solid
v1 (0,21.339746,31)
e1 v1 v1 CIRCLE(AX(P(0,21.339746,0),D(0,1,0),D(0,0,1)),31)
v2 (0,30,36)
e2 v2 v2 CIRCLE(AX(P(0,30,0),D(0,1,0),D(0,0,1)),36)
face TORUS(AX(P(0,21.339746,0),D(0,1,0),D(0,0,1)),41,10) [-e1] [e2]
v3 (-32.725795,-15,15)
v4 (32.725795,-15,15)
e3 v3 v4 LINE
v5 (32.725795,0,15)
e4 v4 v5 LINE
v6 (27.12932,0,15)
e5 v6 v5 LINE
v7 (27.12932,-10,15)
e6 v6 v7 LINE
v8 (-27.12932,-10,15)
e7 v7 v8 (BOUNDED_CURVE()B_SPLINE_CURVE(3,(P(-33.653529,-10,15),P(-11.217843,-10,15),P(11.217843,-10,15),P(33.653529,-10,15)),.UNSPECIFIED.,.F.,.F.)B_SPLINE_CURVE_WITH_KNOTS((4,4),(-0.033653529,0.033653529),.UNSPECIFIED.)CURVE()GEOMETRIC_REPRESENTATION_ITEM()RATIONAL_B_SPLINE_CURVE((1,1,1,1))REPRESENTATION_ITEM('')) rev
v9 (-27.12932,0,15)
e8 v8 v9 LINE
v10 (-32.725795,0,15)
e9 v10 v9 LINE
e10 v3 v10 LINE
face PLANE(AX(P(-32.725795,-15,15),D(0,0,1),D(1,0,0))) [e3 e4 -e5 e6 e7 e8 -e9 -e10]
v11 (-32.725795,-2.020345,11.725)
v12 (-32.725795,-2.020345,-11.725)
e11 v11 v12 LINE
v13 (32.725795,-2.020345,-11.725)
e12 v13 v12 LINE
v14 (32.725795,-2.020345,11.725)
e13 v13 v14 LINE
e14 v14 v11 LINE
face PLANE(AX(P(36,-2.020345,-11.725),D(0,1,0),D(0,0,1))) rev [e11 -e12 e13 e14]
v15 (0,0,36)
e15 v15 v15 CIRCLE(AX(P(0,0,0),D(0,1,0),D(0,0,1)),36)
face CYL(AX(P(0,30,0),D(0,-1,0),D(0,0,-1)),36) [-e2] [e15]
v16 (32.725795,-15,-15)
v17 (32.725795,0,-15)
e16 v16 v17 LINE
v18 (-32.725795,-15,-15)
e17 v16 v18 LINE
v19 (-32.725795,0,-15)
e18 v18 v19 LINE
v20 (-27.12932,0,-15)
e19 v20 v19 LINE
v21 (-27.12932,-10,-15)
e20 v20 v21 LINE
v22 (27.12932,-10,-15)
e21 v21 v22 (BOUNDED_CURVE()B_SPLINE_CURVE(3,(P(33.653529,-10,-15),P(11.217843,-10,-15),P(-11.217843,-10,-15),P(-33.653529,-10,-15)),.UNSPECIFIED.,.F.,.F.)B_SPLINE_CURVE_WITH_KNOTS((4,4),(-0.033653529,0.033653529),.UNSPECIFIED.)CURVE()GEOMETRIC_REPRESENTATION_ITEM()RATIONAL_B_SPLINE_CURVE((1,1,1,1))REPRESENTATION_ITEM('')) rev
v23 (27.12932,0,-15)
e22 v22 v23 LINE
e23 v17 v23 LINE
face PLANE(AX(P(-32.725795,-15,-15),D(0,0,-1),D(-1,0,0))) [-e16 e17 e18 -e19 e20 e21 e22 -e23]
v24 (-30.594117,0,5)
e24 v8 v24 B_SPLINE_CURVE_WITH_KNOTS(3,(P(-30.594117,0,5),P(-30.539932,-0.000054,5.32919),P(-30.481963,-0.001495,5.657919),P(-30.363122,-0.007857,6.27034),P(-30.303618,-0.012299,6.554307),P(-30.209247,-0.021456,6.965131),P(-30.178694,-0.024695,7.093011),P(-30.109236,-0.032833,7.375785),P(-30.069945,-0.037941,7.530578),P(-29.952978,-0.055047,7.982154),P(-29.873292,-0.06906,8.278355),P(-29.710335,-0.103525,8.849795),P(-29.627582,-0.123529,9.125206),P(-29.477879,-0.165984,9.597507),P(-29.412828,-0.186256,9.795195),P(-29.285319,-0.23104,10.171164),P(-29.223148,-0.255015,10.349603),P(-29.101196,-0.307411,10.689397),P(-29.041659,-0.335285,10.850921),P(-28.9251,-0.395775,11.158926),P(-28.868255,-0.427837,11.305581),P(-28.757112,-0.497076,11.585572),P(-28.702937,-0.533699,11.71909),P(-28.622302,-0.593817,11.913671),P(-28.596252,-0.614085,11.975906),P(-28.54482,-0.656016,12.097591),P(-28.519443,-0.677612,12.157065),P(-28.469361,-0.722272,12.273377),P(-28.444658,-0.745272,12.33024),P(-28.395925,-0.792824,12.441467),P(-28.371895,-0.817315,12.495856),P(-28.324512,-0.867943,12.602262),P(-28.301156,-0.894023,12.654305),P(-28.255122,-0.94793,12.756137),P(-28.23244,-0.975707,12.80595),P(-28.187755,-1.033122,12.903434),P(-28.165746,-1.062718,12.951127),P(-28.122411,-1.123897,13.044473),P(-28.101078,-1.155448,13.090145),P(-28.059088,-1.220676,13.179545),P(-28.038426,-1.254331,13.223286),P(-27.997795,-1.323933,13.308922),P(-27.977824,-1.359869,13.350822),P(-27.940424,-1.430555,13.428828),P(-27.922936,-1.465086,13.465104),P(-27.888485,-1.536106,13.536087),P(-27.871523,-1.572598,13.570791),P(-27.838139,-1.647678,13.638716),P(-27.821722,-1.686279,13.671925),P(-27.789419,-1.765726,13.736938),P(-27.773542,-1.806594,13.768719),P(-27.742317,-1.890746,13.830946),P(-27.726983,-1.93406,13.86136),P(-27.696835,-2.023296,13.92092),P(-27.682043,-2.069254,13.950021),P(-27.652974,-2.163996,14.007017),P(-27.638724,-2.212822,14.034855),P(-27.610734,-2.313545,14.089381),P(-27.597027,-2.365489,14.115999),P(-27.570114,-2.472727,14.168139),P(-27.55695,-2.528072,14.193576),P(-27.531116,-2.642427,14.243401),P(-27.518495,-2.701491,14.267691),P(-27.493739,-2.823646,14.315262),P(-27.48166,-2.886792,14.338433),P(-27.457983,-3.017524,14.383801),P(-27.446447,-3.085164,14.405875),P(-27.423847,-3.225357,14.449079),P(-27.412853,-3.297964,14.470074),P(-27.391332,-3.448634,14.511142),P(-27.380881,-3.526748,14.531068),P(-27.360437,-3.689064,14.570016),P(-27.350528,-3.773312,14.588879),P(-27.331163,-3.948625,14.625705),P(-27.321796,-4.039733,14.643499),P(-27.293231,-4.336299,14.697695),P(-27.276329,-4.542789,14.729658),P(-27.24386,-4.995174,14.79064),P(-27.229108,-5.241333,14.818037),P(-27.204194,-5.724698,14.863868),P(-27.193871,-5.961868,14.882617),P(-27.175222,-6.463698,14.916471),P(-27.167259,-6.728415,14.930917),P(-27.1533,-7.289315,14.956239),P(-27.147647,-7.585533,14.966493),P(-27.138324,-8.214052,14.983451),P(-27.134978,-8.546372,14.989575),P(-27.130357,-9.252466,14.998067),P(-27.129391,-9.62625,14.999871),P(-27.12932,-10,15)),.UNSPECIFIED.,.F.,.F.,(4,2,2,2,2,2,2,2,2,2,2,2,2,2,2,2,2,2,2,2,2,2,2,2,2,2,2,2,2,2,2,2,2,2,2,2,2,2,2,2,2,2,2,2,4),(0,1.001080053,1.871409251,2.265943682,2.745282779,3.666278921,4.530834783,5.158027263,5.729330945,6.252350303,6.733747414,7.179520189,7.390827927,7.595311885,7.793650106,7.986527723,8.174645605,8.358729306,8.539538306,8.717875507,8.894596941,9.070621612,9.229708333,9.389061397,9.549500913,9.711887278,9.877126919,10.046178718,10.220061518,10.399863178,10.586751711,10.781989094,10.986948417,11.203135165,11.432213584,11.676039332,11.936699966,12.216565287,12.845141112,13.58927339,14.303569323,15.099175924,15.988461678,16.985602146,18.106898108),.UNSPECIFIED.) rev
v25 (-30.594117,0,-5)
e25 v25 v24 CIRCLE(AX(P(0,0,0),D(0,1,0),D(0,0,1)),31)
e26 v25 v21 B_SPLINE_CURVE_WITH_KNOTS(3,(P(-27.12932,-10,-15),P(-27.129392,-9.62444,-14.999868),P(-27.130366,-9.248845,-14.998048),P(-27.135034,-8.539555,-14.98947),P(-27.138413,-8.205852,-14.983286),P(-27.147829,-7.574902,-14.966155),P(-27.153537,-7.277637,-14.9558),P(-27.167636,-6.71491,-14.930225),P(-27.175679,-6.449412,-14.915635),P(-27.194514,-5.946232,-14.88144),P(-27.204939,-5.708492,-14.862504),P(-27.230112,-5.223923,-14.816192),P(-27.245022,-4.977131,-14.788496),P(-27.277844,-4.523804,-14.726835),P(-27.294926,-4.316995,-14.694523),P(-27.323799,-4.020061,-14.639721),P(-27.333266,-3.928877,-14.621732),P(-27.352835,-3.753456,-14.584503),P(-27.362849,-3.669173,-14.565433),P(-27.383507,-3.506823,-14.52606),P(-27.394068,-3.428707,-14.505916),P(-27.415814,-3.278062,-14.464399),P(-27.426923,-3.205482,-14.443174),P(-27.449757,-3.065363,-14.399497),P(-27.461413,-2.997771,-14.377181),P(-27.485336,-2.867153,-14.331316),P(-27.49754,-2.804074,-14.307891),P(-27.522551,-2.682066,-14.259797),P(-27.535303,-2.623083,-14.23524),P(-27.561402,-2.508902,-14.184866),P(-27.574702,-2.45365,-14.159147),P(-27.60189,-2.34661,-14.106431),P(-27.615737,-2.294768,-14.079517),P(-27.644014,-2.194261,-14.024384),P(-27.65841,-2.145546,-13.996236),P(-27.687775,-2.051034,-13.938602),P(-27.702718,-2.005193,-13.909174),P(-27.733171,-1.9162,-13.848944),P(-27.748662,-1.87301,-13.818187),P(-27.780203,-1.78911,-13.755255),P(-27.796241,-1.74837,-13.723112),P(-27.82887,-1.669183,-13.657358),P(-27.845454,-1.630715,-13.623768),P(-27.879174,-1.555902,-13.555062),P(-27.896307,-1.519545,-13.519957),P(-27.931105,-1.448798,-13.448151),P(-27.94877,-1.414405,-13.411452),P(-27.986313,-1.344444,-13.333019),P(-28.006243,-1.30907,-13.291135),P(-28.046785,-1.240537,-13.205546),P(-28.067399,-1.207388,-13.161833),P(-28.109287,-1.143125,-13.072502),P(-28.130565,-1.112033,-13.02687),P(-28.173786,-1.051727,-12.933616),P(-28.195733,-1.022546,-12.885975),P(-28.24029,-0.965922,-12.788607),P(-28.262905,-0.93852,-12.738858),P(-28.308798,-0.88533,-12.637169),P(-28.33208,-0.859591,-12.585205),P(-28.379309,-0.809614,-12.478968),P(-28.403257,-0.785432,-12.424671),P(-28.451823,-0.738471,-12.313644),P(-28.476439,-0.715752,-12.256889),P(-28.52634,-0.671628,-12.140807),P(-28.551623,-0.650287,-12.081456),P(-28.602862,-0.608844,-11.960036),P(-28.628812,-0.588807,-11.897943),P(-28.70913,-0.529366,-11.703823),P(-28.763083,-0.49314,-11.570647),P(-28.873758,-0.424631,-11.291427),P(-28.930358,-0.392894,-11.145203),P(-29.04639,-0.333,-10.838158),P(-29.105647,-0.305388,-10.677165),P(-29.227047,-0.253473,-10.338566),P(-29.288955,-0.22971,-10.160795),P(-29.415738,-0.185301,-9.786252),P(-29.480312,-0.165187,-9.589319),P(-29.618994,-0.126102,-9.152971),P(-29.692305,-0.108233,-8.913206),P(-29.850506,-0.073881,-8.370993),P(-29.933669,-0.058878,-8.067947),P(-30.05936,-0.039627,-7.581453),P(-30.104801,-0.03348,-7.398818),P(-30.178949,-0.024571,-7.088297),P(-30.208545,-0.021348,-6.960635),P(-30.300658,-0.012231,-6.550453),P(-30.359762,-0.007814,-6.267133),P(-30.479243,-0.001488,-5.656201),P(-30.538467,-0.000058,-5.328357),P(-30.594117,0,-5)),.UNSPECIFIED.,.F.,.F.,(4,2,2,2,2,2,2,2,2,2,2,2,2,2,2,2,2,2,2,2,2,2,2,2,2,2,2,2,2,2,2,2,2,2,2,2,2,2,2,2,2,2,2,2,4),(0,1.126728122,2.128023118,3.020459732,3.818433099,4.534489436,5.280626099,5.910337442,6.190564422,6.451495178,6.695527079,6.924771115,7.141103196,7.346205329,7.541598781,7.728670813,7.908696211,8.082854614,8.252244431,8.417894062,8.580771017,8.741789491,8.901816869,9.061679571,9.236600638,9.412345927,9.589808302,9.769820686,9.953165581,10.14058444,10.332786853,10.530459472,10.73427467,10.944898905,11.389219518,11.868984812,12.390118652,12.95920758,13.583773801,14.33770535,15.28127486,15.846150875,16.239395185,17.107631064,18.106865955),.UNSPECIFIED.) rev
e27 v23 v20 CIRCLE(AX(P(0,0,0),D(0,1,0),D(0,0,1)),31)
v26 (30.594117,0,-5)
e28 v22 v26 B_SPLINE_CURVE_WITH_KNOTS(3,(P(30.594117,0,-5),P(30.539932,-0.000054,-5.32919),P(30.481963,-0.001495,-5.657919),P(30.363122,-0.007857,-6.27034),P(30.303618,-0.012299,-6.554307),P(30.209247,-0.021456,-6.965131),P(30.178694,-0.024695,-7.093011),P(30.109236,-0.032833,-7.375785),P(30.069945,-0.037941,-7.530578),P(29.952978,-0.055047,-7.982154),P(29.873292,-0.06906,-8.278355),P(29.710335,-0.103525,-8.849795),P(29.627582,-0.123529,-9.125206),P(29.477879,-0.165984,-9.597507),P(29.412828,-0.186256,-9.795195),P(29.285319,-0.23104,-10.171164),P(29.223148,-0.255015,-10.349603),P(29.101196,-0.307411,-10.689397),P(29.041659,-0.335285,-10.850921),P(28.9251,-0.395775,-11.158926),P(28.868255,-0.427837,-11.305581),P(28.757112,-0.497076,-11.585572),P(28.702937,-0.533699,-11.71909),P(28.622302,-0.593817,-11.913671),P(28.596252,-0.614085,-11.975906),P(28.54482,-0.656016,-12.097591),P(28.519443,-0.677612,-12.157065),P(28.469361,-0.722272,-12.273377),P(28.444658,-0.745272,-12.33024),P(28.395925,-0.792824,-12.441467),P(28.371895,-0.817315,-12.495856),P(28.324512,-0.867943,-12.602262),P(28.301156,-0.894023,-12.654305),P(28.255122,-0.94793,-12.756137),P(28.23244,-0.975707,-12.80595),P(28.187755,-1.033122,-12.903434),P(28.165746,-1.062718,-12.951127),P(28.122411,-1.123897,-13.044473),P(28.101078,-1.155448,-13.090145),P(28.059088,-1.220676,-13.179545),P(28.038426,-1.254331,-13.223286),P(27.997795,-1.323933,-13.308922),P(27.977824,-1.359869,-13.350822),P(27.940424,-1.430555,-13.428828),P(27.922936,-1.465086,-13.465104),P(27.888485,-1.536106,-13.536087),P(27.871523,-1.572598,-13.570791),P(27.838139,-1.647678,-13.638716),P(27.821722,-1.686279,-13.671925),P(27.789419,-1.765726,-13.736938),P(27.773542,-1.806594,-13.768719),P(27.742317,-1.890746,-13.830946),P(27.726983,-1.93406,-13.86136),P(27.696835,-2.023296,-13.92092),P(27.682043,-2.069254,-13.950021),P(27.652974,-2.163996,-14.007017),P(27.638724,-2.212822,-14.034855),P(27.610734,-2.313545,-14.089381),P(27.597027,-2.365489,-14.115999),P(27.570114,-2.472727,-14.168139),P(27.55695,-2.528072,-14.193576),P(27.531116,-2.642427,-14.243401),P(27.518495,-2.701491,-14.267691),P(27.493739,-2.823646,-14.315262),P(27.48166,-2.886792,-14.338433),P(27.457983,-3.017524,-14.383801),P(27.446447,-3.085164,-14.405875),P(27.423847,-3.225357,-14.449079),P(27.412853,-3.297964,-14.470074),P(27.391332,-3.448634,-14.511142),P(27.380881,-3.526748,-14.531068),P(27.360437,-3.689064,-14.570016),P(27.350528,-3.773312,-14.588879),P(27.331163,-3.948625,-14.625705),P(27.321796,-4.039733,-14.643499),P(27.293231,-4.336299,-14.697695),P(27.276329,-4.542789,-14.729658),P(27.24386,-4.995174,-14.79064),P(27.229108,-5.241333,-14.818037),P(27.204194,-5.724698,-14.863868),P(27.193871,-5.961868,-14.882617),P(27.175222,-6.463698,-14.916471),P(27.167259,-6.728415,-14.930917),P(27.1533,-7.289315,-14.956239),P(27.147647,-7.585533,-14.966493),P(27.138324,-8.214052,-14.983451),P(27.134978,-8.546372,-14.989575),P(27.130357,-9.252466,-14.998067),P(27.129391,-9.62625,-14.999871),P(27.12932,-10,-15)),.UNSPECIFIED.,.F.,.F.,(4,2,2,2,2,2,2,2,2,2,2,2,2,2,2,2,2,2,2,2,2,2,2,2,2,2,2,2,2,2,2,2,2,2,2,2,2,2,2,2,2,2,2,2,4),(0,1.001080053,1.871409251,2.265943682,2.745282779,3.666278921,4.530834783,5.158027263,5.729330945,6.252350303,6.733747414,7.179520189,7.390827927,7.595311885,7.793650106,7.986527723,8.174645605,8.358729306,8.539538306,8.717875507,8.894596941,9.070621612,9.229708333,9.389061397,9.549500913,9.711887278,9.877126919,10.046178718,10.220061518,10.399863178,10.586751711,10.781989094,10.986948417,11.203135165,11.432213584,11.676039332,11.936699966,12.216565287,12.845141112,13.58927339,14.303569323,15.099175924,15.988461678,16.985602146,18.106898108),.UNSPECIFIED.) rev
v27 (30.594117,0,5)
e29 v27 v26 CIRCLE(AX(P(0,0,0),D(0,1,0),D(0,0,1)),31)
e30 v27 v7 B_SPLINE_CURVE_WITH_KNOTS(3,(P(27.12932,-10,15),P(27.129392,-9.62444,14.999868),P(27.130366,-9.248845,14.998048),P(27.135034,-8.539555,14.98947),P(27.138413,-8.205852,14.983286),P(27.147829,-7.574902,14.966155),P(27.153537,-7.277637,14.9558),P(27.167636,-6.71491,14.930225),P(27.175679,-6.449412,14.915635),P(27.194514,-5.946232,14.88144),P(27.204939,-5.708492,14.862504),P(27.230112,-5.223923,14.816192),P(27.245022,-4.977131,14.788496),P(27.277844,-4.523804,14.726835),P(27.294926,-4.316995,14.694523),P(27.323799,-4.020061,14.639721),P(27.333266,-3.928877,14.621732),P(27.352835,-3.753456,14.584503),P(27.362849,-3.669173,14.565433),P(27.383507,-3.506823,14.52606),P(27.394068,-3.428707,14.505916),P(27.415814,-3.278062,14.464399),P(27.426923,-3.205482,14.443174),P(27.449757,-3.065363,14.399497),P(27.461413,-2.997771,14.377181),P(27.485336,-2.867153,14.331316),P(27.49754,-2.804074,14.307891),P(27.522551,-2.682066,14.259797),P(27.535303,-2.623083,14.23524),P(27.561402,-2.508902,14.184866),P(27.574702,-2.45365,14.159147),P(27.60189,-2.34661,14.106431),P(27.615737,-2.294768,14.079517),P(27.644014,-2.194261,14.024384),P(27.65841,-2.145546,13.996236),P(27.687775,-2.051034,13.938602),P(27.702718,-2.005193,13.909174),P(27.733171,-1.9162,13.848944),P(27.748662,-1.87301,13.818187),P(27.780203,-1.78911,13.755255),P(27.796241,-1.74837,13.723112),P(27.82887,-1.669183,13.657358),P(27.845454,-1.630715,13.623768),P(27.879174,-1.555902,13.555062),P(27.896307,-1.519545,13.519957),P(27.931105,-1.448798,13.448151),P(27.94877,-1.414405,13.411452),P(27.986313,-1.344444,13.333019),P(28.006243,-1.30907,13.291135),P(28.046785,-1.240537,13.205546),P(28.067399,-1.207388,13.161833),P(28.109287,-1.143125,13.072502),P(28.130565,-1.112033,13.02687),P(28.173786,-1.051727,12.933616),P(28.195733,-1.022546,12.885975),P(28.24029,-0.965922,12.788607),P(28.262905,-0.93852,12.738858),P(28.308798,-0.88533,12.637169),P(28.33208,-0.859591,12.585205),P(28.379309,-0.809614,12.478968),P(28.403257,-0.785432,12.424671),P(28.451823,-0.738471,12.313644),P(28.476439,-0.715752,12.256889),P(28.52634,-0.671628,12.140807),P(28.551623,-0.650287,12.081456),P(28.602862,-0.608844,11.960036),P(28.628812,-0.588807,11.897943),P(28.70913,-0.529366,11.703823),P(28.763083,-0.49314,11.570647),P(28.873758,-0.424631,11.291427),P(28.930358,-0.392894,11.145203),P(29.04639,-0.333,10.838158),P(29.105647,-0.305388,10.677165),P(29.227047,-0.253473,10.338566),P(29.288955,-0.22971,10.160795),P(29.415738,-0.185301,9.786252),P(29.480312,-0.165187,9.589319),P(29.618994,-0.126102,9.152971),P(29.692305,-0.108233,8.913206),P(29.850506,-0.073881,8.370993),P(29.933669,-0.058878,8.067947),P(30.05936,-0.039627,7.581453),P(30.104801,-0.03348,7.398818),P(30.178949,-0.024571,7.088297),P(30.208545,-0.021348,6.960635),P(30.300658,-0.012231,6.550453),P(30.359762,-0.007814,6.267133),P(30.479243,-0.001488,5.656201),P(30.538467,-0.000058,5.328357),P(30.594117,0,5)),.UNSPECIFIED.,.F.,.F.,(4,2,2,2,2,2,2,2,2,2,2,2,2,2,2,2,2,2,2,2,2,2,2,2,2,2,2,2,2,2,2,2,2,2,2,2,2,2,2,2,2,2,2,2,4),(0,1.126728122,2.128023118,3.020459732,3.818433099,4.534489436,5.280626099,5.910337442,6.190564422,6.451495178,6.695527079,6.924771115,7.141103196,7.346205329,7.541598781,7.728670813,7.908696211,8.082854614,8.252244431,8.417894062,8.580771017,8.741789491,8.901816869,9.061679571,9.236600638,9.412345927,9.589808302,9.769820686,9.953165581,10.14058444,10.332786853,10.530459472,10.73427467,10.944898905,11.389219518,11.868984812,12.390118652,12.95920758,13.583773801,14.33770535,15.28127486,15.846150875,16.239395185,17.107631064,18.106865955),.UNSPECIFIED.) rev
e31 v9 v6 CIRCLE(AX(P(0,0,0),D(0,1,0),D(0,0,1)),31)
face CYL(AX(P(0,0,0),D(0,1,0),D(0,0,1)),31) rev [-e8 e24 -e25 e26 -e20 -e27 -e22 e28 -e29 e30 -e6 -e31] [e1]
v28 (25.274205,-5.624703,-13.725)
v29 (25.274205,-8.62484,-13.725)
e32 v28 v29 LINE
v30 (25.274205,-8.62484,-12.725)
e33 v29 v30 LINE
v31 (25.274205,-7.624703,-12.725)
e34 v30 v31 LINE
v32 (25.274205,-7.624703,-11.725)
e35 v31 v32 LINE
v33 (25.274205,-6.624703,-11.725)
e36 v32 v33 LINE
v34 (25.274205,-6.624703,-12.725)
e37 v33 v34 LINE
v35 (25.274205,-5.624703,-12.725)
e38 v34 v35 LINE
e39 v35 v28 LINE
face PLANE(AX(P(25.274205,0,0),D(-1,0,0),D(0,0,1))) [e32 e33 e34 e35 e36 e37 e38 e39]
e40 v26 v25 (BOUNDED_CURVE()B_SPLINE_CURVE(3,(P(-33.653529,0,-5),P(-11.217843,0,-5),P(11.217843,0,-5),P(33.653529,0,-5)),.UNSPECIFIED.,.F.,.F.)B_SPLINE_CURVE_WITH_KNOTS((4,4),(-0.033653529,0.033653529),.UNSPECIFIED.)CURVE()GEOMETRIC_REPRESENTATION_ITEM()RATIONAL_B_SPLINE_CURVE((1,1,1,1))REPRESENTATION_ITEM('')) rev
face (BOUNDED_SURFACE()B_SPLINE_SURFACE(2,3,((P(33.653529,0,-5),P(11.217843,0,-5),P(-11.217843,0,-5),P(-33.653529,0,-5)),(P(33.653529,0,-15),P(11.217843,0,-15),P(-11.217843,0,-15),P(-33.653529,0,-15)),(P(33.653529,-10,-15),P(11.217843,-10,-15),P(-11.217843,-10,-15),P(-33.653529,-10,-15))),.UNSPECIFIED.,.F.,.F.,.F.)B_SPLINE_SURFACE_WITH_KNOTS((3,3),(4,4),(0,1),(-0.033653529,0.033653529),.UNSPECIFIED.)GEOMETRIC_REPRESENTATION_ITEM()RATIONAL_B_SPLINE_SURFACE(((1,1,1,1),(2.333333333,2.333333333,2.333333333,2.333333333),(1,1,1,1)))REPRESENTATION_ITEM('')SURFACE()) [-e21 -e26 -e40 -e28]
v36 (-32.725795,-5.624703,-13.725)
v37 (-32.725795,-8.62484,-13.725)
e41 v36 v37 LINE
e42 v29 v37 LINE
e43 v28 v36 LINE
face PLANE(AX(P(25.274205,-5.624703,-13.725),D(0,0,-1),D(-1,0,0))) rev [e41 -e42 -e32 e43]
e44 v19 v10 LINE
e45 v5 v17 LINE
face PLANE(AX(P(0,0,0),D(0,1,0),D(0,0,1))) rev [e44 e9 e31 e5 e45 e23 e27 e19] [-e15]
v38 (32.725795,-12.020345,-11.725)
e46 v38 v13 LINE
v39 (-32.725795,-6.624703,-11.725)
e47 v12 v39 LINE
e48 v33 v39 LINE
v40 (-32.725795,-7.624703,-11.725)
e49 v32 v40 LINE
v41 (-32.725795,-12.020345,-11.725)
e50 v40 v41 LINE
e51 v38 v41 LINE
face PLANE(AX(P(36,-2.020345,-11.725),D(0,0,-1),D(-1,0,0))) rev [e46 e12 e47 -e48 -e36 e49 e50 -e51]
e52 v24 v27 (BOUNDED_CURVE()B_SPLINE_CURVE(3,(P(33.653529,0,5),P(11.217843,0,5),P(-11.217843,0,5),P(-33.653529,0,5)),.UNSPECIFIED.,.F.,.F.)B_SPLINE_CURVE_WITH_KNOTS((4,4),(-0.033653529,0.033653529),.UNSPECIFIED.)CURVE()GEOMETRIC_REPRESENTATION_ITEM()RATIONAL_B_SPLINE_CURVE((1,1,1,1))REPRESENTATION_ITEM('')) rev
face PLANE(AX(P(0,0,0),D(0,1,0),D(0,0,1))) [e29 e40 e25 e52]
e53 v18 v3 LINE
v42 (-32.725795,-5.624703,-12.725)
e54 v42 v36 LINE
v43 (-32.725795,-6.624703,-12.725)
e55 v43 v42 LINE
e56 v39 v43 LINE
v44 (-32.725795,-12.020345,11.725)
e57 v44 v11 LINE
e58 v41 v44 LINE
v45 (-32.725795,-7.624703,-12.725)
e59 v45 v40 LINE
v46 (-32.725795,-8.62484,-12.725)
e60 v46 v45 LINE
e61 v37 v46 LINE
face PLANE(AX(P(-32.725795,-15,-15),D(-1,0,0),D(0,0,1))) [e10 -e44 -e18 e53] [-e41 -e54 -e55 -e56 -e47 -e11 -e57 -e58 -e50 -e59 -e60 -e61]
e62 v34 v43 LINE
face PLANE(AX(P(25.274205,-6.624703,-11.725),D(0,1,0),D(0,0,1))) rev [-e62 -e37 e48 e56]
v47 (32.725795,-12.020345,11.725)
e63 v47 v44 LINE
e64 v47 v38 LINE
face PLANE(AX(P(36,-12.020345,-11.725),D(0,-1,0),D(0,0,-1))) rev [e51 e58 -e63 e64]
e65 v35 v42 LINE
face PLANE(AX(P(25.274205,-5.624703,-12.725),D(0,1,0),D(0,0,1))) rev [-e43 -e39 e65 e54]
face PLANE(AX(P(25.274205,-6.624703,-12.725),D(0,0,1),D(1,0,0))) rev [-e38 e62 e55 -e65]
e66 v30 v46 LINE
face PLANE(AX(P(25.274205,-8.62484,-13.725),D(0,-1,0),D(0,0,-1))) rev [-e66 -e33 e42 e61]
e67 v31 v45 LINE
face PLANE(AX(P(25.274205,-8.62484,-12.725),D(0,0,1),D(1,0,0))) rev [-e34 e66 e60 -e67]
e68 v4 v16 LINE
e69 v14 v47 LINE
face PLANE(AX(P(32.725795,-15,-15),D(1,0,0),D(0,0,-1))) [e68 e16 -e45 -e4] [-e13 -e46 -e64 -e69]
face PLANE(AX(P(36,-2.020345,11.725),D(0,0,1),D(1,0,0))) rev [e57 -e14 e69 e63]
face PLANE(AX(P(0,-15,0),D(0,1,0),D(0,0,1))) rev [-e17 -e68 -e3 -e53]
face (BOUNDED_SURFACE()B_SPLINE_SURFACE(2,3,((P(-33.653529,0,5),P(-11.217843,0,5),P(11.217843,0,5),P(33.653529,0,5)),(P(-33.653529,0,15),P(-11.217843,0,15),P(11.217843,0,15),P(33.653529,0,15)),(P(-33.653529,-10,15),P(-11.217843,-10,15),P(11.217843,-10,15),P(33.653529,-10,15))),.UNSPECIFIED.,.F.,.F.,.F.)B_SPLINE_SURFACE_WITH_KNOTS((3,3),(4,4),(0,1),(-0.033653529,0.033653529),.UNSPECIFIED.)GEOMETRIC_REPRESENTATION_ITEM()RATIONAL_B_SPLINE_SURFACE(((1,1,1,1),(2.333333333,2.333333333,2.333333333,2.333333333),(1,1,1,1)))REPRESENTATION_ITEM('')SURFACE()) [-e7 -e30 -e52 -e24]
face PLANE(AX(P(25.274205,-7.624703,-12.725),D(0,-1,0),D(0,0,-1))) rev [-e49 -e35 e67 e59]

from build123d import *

# Parameters (mm, degrees)
SKETCH_1_R          = 36
EXTRUDE_1_DEPTH     = 30
SKETCH_2_R          = 31
CUT_EXTRUDE_1_DEPTH = 30
FILLET_1_R          = 10
SKETCH_11_W         = 65.45159038682868
SKETCH_11_H         = 30
EXTRUDE_8_DEPTH     = 15
CUT_EXTRUDE_3_DEPTH = 84.18193869444944
CUT_EXTRUDE_4_DEPTH = 58.00000000000003
FILLET_2_SIZE       = 10


with BuildPart() as part:
    # 草圖1 → 填料-伸長1 (new body)
    with BuildSketch(Plane(origin=(0, 0, 0), x_dir=(1, 0, 0), z_dir=(0, 1, 0))):
        with Locations(Location((0, 0, 0), (0, 0, 270))):
            Circle(SKETCH_1_R)
    extrude(amount=EXTRUDE_1_DEPTH)

    # 草圖2 → 除料-伸長1 (cut)
    with BuildSketch(Plane(origin=(0, 30, 0), x_dir=(1, 0, 0), z_dir=(0, 1, 0))):
        with Locations(Location((0, 0, 0), (0, 0, 270))):
            Circle(SKETCH_2_R)
    extrude(amount=-CUT_EXTRUDE_1_DEPTH, mode=Mode.SUBTRACT)

    # 圓角1
    # the kernel refuses this fillet: 10 mm, written as the material it takes off along each edge
    with BuildSketch(Plane(origin=(0, 30, 0), x_dir=(-1.8e-16, 0, 1), z_dir=(-1, 0, -1.8e-16))) as fillet_1_piece_1:
        with BuildLine():
            CenterArc((41, -8.660254037844858), FILLET_1_R, 119.99999999999864, 60.000000000001364)
            Line((31.000000000000004, -8.660254037844858), (30.800000000000004, -8.660254037844858))
            Line((30.800000000000004, -8.660254037844858), (30.8, 0))
            Line((30.8, 0), (31, 0.1999999999999993))
            ThreePointArc((31, 0.1999999999999993), (33.5000000000001, 0.1999999999999993), (35.90000000000021, 0.17320508075653507))
            Line((35.90000000000021, 0.17320508075653507), (36.000000000000206, -3.5527e-13))
        make_face()
    revolve(axis=Axis((0, 30, 0), (0, 1, 0)), mode=Mode.SUBTRACT)

    # 草圖11 → 填料-伸長8 (add)
    with BuildSketch(Plane(origin=(0, 0, 0), x_dir=(1, 0, 0), z_dir=(0, 1, 0))):
        Rectangle(SKETCH_11_W, SKETCH_11_H)
    extrude(amount=-EXTRUDE_8_DEPTH)

    # 草圖16 → 除料-伸長3 (cut, through all)
    with BuildSketch(Plane.ZY.offset(32.72579519341434)):
        Polygon((-11.724999999999989, -2.02034535171655), (11.725000000000014, -2.02034535171655), (11.725000000000014, -12.02034535171655), (-11.724999999999985, -12.02034535171655), align=None)
    extrude(amount=-CUT_EXTRUDE_3_DEPTH, mode=Mode.SUBTRACT)

    # 草圖19 → 除料-伸長4 (cut)
    with BuildSketch(Plane.ZY.offset(32.72579519341434)):
        Polygon((-11.72500000000632, -6.624703450403075), (-12.725000000017417, -6.624703450403075), (-12.725000000017417, -5.624703450403075), (-13.725000000017417, -5.624703450403075), (-13.725000000017417, -8.624839762103937), (-12.725000000017417, -8.624839762103937), (-12.725000000017417, -7.624703450403074), (-11.72500000000632, -7.624703450403074), align=None)
    extrude(amount=-CUT_EXTRUDE_4_DEPTH, mode=Mode.SUBTRACT)

    # 圓角2
    # a fillet whose section is not a circle: 10 mm, written as the material it takes off along each edge
    with BuildSketch(Plane(origin=(52.129319932501346, 0, 15.000000000000002), x_dir=(0, -1, 0), z_dir=(-1, 0, 0))) as fillet_2_piece_1_section:
        with BuildLine():
            Bezier((FILLET_2_SIZE, 0), (0, 0), (0, -FILLET_2_SIZE), weights=[1, 2.3333333333333304, 1])
            Line((0, -FILLET_2_SIZE), (-FILLET_2_SIZE * 0.02, -FILLET_2_SIZE))
            Line((-FILLET_2_SIZE * 0.02, -FILLET_2_SIZE), (-FILLET_2_SIZE * 0.02, FILLET_2_SIZE * 0.02))
            Line((-FILLET_2_SIZE * 0.02, FILLET_2_SIZE * 0.02), (FILLET_2_SIZE, FILLET_2_SIZE * 0.02))
            Line((FILLET_2_SIZE, FILLET_2_SIZE * 0.02), (FILLET_2_SIZE, 0))
        make_face()
    fillet_2_piece_1 = extrude(amount=104.25863986500269, mode=Mode.PRIVATE)
    fillet_2_piece_1 = split(fillet_2_piece_1, bisect_by=Plane(origin=(52.129319932501346, 0, 15.000000000000002), z_dir=(0, -1, 0)), keep=Keep.TOP, mode=Mode.PRIVATE)
    fillet_2_piece_1 = fillet_2_piece_1 & Plane(origin=(0, 0, 0), x_dir=(-1.8e-16, 0, 1), z_dir=(0, 1, 0)) * Cylinder(31, 249, mode=Mode.PRIVATE)
    add(fillet_2_piece_1, mode=Mode.SUBTRACT)
    with BuildSketch(Plane(origin=(-52.12931993250088, 0, -14.999999999999998), x_dir=(0, -1, 0), z_dir=(1, 0, 0))) as fillet_2_piece_2_section:
        with BuildLine():
            Bezier((FILLET_2_SIZE, 0), (0, 0), (0, -FILLET_2_SIZE), weights=[1, 2.3333333333333304, 1])
            Line((0, -FILLET_2_SIZE), (-FILLET_2_SIZE * 0.02, -FILLET_2_SIZE))
            Line((-FILLET_2_SIZE * 0.02, -FILLET_2_SIZE), (-FILLET_2_SIZE * 0.02, FILLET_2_SIZE * 0.02))
            Line((-FILLET_2_SIZE * 0.02, FILLET_2_SIZE * 0.02), (FILLET_2_SIZE, FILLET_2_SIZE * 0.02))
            Line((FILLET_2_SIZE, FILLET_2_SIZE * 0.02), (FILLET_2_SIZE, 0))
        make_face()
    fillet_2_piece_2 = extrude(amount=104.25863986500174, mode=Mode.PRIVATE)
    fillet_2_piece_2 = split(fillet_2_piece_2, bisect_by=Plane(origin=(-52.12931993250088, 0, -14.999999999999998), z_dir=(0, -1, 0)), keep=Keep.TOP, mode=Mode.PRIVATE)
    fillet_2_piece_2 = fillet_2_piece_2 & Plane(origin=(0, 0, 0), x_dir=(-1.8e-16, 0, 1), z_dir=(0, 1, 0)) * Cylinder(31, 249, mode=Mode.PRIVATE)
    add(fillet_2_piece_2, mode=Mode.SUBTRACT)


solid = part.part
